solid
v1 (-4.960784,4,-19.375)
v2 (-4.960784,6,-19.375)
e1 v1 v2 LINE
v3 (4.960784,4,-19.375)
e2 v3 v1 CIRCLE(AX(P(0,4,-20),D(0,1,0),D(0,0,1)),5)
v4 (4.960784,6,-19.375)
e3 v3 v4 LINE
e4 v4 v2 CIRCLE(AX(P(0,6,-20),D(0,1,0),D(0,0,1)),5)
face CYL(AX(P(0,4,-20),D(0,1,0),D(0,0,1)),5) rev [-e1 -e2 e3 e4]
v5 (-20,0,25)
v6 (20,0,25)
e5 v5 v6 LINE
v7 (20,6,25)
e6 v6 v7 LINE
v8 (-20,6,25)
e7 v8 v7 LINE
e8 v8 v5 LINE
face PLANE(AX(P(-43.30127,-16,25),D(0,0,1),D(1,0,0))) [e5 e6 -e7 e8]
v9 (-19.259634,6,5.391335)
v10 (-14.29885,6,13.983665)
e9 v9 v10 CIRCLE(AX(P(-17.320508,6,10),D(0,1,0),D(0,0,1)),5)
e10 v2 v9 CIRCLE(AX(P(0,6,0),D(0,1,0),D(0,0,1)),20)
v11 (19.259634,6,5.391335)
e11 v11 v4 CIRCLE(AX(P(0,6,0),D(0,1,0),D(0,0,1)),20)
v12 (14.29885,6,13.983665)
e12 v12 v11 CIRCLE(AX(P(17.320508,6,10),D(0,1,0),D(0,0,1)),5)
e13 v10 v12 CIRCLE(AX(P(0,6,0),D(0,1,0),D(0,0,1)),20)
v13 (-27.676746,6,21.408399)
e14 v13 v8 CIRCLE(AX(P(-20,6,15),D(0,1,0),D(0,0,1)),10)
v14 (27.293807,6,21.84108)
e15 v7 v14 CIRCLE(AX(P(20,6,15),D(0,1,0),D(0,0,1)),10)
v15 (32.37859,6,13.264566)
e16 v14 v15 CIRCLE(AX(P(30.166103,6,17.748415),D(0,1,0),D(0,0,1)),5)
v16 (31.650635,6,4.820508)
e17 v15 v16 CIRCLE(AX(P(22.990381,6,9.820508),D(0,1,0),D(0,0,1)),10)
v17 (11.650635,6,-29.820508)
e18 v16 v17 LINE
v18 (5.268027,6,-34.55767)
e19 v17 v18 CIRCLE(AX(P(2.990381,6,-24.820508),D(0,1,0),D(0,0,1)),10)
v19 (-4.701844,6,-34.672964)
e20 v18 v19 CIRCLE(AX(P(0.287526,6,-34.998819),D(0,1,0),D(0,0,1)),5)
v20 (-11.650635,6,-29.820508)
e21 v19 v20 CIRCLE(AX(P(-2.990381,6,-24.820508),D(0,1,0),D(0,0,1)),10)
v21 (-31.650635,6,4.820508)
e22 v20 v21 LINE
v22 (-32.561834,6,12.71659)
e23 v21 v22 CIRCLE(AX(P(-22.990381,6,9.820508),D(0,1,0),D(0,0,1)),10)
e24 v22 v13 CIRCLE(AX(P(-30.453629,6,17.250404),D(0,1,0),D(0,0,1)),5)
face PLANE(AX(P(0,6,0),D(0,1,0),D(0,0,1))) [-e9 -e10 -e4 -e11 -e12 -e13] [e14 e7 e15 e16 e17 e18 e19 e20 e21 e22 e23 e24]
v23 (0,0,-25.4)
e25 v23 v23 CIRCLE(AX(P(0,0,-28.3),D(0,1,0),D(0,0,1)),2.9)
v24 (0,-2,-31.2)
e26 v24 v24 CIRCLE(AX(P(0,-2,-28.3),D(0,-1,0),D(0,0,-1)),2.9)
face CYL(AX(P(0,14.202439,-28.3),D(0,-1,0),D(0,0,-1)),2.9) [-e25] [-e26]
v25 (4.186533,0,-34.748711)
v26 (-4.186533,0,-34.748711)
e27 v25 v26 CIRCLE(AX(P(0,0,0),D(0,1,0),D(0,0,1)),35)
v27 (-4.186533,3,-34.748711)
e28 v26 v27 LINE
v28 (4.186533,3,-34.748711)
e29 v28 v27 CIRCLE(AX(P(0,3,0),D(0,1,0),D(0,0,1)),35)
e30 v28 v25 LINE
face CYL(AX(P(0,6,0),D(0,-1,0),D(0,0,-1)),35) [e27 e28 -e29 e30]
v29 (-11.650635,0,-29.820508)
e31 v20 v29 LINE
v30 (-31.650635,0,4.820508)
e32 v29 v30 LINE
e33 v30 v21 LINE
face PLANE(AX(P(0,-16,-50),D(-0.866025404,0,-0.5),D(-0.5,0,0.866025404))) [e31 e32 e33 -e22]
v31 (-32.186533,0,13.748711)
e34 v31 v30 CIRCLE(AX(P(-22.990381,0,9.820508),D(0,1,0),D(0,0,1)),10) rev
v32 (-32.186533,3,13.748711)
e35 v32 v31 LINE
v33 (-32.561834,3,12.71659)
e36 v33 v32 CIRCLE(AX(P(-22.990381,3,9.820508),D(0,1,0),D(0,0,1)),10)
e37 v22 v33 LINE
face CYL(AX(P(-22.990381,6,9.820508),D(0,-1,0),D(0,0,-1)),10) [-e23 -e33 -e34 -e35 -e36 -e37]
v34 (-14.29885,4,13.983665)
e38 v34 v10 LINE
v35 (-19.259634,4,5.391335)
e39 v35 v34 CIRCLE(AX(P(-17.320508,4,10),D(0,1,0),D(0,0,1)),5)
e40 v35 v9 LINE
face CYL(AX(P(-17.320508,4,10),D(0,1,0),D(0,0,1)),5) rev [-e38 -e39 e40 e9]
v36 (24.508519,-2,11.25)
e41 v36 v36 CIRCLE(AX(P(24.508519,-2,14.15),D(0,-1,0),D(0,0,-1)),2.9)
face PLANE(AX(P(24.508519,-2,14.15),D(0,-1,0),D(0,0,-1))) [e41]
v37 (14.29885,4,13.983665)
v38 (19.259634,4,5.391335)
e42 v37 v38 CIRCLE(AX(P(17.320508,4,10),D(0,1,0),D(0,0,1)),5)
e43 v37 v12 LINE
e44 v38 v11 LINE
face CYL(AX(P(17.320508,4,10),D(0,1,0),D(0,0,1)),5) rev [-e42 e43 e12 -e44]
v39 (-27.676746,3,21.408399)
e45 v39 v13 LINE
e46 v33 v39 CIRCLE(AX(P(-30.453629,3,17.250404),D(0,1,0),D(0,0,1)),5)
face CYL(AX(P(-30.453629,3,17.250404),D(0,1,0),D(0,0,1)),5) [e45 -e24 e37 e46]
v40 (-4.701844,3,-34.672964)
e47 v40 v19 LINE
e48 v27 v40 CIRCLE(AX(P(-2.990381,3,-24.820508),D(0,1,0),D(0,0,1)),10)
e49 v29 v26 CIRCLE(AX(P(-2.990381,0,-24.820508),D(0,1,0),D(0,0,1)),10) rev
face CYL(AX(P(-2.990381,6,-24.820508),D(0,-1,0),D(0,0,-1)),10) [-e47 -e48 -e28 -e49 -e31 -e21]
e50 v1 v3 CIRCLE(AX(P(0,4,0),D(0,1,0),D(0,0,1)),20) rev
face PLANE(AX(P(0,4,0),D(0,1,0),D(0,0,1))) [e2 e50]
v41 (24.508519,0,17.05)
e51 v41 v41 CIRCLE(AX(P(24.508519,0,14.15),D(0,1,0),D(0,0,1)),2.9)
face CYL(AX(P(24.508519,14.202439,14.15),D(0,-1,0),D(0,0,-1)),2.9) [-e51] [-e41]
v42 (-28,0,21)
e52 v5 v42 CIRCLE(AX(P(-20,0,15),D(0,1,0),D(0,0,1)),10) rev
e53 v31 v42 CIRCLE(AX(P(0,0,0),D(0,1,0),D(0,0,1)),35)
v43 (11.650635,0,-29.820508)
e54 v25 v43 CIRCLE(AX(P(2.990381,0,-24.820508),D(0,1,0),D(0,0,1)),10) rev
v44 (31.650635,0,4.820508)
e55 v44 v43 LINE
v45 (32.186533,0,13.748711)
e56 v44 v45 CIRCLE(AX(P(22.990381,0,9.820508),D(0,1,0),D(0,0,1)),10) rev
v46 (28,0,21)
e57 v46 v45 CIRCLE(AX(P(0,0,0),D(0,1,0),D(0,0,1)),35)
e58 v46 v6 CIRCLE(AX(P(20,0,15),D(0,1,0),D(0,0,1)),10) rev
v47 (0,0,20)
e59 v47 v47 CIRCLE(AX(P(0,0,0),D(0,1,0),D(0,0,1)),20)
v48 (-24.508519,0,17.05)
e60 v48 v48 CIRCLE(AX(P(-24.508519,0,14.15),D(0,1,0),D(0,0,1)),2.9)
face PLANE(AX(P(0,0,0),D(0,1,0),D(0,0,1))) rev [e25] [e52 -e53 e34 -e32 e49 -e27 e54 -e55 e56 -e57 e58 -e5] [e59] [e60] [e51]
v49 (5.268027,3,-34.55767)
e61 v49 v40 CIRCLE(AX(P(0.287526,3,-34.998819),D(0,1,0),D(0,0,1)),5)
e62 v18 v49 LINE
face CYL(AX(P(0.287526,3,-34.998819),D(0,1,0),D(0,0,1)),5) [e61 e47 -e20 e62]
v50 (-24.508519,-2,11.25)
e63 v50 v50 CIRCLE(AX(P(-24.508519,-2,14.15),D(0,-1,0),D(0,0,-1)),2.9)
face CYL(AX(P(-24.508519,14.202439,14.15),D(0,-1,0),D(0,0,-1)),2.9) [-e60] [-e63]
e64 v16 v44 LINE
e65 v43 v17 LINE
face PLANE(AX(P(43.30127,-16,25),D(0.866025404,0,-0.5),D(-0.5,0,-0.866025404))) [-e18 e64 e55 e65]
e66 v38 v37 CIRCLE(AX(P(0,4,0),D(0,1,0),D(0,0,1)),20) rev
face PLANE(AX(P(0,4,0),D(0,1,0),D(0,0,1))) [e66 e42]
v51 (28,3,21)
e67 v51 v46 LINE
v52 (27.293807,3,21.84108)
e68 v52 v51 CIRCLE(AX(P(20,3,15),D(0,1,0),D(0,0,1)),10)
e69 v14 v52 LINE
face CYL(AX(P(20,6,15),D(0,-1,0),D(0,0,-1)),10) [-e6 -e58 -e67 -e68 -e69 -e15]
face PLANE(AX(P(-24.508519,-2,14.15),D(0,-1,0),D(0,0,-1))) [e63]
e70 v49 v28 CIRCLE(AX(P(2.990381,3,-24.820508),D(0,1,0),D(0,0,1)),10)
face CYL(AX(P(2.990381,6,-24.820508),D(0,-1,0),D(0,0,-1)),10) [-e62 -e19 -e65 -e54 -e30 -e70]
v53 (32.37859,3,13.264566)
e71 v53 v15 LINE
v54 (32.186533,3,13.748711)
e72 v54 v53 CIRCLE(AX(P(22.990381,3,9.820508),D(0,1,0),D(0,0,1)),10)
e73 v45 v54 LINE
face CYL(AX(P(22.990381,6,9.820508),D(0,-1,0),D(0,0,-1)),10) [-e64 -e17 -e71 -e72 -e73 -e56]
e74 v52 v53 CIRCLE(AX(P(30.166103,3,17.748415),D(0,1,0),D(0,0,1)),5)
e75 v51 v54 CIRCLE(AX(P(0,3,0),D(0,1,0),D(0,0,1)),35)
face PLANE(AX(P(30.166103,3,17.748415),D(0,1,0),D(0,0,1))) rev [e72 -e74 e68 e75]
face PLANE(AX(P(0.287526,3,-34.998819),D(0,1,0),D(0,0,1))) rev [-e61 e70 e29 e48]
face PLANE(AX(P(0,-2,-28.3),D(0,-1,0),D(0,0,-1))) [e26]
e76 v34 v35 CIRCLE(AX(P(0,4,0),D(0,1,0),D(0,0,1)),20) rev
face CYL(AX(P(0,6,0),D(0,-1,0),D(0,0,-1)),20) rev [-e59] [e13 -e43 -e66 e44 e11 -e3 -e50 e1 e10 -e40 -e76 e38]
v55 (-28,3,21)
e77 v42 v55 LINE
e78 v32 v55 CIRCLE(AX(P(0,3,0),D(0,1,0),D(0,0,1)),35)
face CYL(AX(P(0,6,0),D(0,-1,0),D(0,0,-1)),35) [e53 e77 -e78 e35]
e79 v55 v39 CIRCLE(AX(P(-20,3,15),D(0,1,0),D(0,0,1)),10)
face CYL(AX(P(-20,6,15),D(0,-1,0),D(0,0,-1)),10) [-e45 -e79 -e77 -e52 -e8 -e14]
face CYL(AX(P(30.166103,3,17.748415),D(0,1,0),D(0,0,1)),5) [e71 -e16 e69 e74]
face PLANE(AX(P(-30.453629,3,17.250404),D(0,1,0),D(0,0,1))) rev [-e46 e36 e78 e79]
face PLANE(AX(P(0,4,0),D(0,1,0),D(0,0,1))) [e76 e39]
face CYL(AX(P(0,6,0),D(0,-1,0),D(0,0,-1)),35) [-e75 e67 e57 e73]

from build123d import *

# Parameters (mm, degrees)
SKETCH1_R                = 20
BOSS_EXTRUDE1_DEPTH      = 3.5
SKETCH2_R                = 35
SKETCH2_R_2              = 20
SKETCH2_R_3              = 2.8
BOSS_EXTRUDE2_DEPTH      = 6
BOSS_EXTRUDE3_DEPTH      = 2
BOSS_EXTRUDE3_DEPTH_BACK = 6
SKETCH4_R                = 2.9
SKETCH5_R                = 5
BOSS_EXTRUDE4_DEPTH      = 3
CUT_EXTRUDE1_START       = -10
SKETCH3_R                = 20
CUT_EXTRUDE1_DEPTH       = 10
SKETCH12_R               = 72.135852014
CUT_EXTRUDE2_DEPTH       = 22
FILLET1_R                = 10
CUT_EXTRUDE4_START       = -2
SKETCH15_R               = 5
SKETCH15_R_2             = 20
CUT_EXTRUDE4_DEPTH       = 2


with BuildPart() as part:
    # Sketch1 → Boss-Extrude1 (new body)
    with BuildSketch(Plane(origin=(0, 0, 0), x_dir=(1, 0, 0), z_dir=(0, 1, 0))):
        with Locations(Location((0, 0, 0), (0, 0, 270))):
            Circle(SKETCH1_R)
    extrude(amount=BOSS_EXTRUDE1_DEPTH)

    # Sketch2 → Boss-Extrude2 (add)
    with BuildSketch(Plane(origin=(0, 0, 0), x_dir=(1, 0, 0), z_dir=(0, 1, 0))):
        with Locations(Location((0, 0, 0), (0, 0, 270))):
            Circle(SKETCH2_R)
        with Locations(Location((0, 0, 0), (0, 0, 270))):
            Circle(SKETCH2_R_2, mode=Mode.SUBTRACT)
        with Locations(Location((0, 28.3, 0), (0, 0, 270))):
            Circle(SKETCH2_R_3, mode=Mode.SUBTRACT)
        with Locations(Location((24.508518927, -14.15, 0), (0, 0, 270))):
            Circle(SKETCH2_R_3, mode=Mode.SUBTRACT)
        with Locations(Location((-24.508518927, -14.15, 0), (0, 0, 270))):
            Circle(SKETCH2_R_3, mode=Mode.SUBTRACT)
    extrude(amount=BOSS_EXTRUDE2_DEPTH)

    # Sketch4 → Boss-Extrude3 (add, two sides: drawn at the far end of the back side and taken through both)
    with BuildSketch(Plane.XZ.offset(-BOSS_EXTRUDE3_DEPTH_BACK)):
        with Locations(Location((-24.508518927, 14.15, 0), (0, 0, 270))):
            Circle(SKETCH4_R)
        with Locations(Location((24.508518927, 14.15, 0), (0, 0, 270))):
            Circle(SKETCH4_R)
        with Locations(Location((0, -28.3, 0), (0, 0, 270))):
            Circle(SKETCH4_R)
    extrude(amount=BOSS_EXTRUDE3_DEPTH + BOSS_EXTRUDE3_DEPTH_BACK)

    # Sketch5 → Boss-Extrude4 (add)
    with BuildSketch(Plane(origin=(0, 6, 0), x_dir=(1, 0, 0), z_dir=(0, 1, 0))):
        with Locations((-30.453629482, -17.250404383)):
            Circle(SKETCH5_R)
        with Locations((0.28752632, 34.99881896)):
            Circle(SKETCH5_R)
        with Locations((30.166103162, -17.748414577)):
            Circle(SKETCH5_R)
    extrude(amount=-BOSS_EXTRUDE4_DEPTH)

    # Sketch3 → Cut-Extrude1 (cut)
    with BuildSketch(Plane(origin=(0, 3.5, 0), x_dir=(1, 0, 0), z_dir=(0, 1, 0)).offset(CUT_EXTRUDE1_START)):
        with Locations(Location((0, 0, 0), (0, 0, 270))):
            Circle(SKETCH3_R)
    extrude(amount=CUT_EXTRUDE1_DEPTH, mode=Mode.SUBTRACT)

    # Sketch12 → Cut-Extrude2 (cut)
    with BuildSketch(Plane(origin=(0, 6, 0), x_dir=(1, 0, 0), z_dir=(0, 1, 0))):
        Circle(SKETCH12_R)
        Polygon((0, 50), (-43.301270189, -25), (43.301270189, -25), align=None, mode=Mode.SUBTRACT)
    extrude(amount=-CUT_EXTRUDE2_DEPTH, mode=Mode.SUBTRACT)

    # Fillet1
    # the kernel refuses this fillet: 10 mm, written as the material it takes off along each edge
    with BuildSketch(Plane(origin=(-24.494897428, 19.2960859, 25), x_dir=(1, 0, 0), z_dir=(0, -1, 0))) as fillet1_piece_1_section:
        with BuildLine():
            CenterArc((4.494897428, -10), FILLET1_R, 90, 53.130102354)
            ThreePointArc((-3.505102572, -4), (-1.828638885, -1.933326291), (0, 0))
            Line((0, 0), (4.494897428, 0))
        make_face()
    fillet1_piece_1 = extrude(amount=32.5921718, mode=Mode.PRIVATE)
    fillet1_piece_1 = fillet1_piece_1 - Plane(origin=(-30.453629482, 4.5, 17.250404383), x_dir=(1, 0, 0), z_dir=(0, 1, 0)) * Cylinder(5, 84, mode=Mode.PRIVATE)
    add(fillet1_piece_1, mode=Mode.SUBTRACT)
    with BuildSketch(Plane(origin=(-24.494897428, 19.2960859, 25), x_dir=(1, 0, 0), z_dir=(0, -1, 0))) as fillet1_piece_2_section:
        with BuildLine():
            CenterArc((4.494897428, -10), FILLET1_R, 90, 53.130102354)
            ThreePointArc((-3.505102572, -4), (-1.828638885, -1.933326291), (0, 0))
            Line((0, 0), (4.494897428, 0))
        make_face()
    fillet1_piece_2 = extrude(amount=32.5921718, mode=Mode.PRIVATE)
    fillet1_piece_2 = split(fillet1_piece_2, bisect_by=Plane(origin=(-27.761621835, 3, 21.309124186), z_dir=(0, -1, 0)), keep=Keep.TOP, mode=Mode.PRIVATE)
    add(fillet1_piece_2, mode=Mode.SUBTRACT)
    with BuildSketch(Plane(origin=(24.494897428, 19.2960859, 25), x_dir=(-1, 0, 0), z_dir=(0, -1, 0))) as fillet1_piece_3_section:
        with BuildLine():
            CenterArc((4.494897428, 10), FILLET1_R, 216.869897646, 53.130102354)
            ThreePointArc((-3.505102572, 4), (-1.828638885, 1.933326291), (0, 0))
            Line((0, 0), (4.494897428, 0))
        make_face()
    fillet1_piece_3 = extrude(amount=32.5921718, mode=Mode.PRIVATE)
    fillet1_piece_3 = fillet1_piece_3 - Plane(origin=(30.166103162, 4.5, 17.748414577), x_dir=(1, 0, 0), z_dir=(0, 1, 0)) * Cylinder(5, 84, mode=Mode.PRIVATE)
    add(fillet1_piece_3, mode=Mode.SUBTRACT)
    with BuildSketch(Plane(origin=(24.494897428, 19.2960859, 25), x_dir=(-1, 0, 0), z_dir=(0, -1, 0))) as fillet1_piece_4_section:
        with BuildLine():
            CenterArc((4.494897428, 10), FILLET1_R, 216.869897646, 53.130102354)
            ThreePointArc((-3.505102572, 4), (-1.828638885, 1.933326291), (0, 0))
            Line((0, 0), (4.494897428, 0))
        make_face()
    fillet1_piece_4 = extrude(amount=32.5921718, mode=Mode.PRIVATE)
    fillet1_piece_4 = split(fillet1_piece_4, bisect_by=Plane(origin=(27.488157838, 3, 21.643747381), z_dir=(0, -1, 0)), keep=Keep.TOP, mode=Mode.PRIVATE)
    add(fillet1_piece_4, mode=Mode.SUBTRACT)
    with BuildSketch(Plane(origin=(-9.403186381, 19.2960859, -33.713203436), x_dir=(-0.5000000000000003, 0, 0.8660254037844386), z_dir=(0, -1, 0))) as fillet1_piece_5_section:
        with BuildLine():
            CenterArc((4.494897428, -10), FILLET1_R, 90, 53.130102354)
            ThreePointArc((-3.505102572, -4), (-1.828638885, -1.933326291), (0, 0))
            Line((0, 0), (4.494897428, 0))
        make_face()
    fillet1_piece_5 = extrude(amount=32.5921718, mode=Mode.PRIVATE)
    fillet1_piece_5 = fillet1_piece_5 - Plane(origin=(0.28752632, 4.5, -34.99881896), x_dir=(1, 0, 0), z_dir=(0, 1, 0)) * Cylinder(5, 84, mode=Mode.PRIVATE)
    add(fillet1_piece_5, mode=Mode.SUBTRACT)
    with BuildSketch(Plane(origin=(-9.403186381, 19.2960859, -33.713203436), x_dir=(-0.5000000000000003, 0, 0.8660254037844386), z_dir=(0, -1, 0))) as fillet1_piece_6_section:
        with BuildLine():
            CenterArc((4.494897428, -10), FILLET1_R, 90, 53.130102354)
            ThreePointArc((-3.505102572, -4), (-1.828638885, -1.933326291), (0, 0))
            Line((0, 0), (4.494897428, 0))
        make_face()
    fillet1_piece_6 = extrude(amount=32.5921718, mode=Mode.PRIVATE)
    fillet1_piece_6 = split(fillet1_piece_6, bisect_by=Plane(origin=(-4.57343196, 3, -34.696831852), z_dir=(0, -1, 0)), keep=Keep.TOP, mode=Mode.PRIVATE)
    add(fillet1_piece_6, mode=Mode.SUBTRACT)
    with BuildSketch(Plane(origin=(-33.898083809, 19.2960859, 8.713203436), x_dir=(0.32181469455231854, 0, 0.9468026734067654), z_dir=(0, -1, 0))) as fillet1_piece_7_section:
        with BuildLine():
            CenterArc((4.558658023, -9.971095222), FILLET1_R, 85.642603122, 53.130102354)
            Line((-2.962352352, -3.380617019), (0, 0))
            ThreePointArc((0, 0), (2.65921718, 0.101166725), (5.31843436, 0))
        make_face()
    fillet1_piece_7 = extrude(amount=32.5921718, mode=Mode.PRIVATE)
    fillet1_piece_7 = fillet1_piece_7 - Plane(origin=(-30.453629482, 4.5, 17.250404383), x_dir=(1, 0, 0), z_dir=(0, 1, 0)) * Cylinder(5, 87, mode=Mode.PRIVATE)
    add(fillet1_piece_7, mode=Mode.SUBTRACT)
    with BuildSketch(Plane(origin=(-33.898083809, 19.2960859, 8.713203436), x_dir=(0.32181469455231854, 0, 0.9468026734067654), z_dir=(0, -1, 0))) as fillet1_piece_8_section:
        with BuildLine():
            CenterArc((4.558658023, -9.971095222), FILLET1_R, 85.642603122, 53.130102354)
            Line((-2.962352352, -3.380617019), (0, 0))
            ThreePointArc((0, 0), (2.65921718, 0.101166725), (5.31843436, 0))
        make_face()
    fillet1_piece_8 = extrude(amount=32.5921718, mode=Mode.PRIVATE)
    fillet1_piece_8 = split(fillet1_piece_8, bisect_by=Plane(origin=(-32.488113984, 3, 12.9835693), z_dir=(0, -1, 0)), keep=Keep.TOP, mode=Mode.PRIVATE)
    add(fillet1_piece_8, mode=Mode.SUBTRACT)
    with BuildSketch(Plane(origin=(33.898083809, 19.2960859, 8.713203436), x_dir=(-0.5000000000000012, 0, -0.8660254037844382), z_dir=(0, -1, 0))) as fillet1_piece_9_section:
        with BuildLine():
            CenterArc((4.494897428, -10), FILLET1_R, 90, 53.130102354)
            ThreePointArc((-3.505102572, -4), (-1.828638885, -1.933326291), (0, 0))
            Line((0, 0), (4.494897428, 0))
        make_face()
    fillet1_piece_9 = extrude(amount=32.5921718, mode=Mode.PRIVATE)
    fillet1_piece_9 = fillet1_piece_9 - Plane(origin=(30.166103162, 4.5, 17.748414577), x_dir=(1, 0, 0), z_dir=(0, 1, 0)) * Cylinder(5, 84, mode=Mode.PRIVATE)
    add(fillet1_piece_9, mode=Mode.SUBTRACT)
    with BuildSketch(Plane(origin=(33.898083809, 19.2960859, 8.713203436), x_dir=(-0.5000000000000012, 0, -0.8660254037844382), z_dir=(0, -1, 0))) as fillet1_piece_10_section:
        with BuildLine():
            CenterArc((4.494897428, -10), FILLET1_R, 90, 53.130102354)
            ThreePointArc((-3.505102572, -4), (-1.828638885, -1.933326291), (0, 0))
            Line((0, 0), (4.494897428, 0))
        make_face()
    fillet1_piece_10 = extrude(amount=32.5921718, mode=Mode.PRIVATE)
    fillet1_piece_10 = split(fillet1_piece_10, bisect_by=Plane(origin=(32.335053795, 3, 13.387707666), z_dir=(0, -1, 0)), keep=Keep.TOP, mode=Mode.PRIVATE)
    add(fillet1_piece_10, mode=Mode.SUBTRACT)
    with BuildSketch(Plane(origin=(9.403186381, 19.2960859, -33.713203436), x_dir=(-0.9808625148174394, 0, -0.19470163590994477), z_dir=(0, -1, 0))) as fillet1_piece_11_section:
        with BuildLine():
            CenterArc((4.558658023, -9.971095222), FILLET1_R, 85.642603122, 53.130102354)
            Line((-2.962352352, -3.380617019), (0, 0))
            ThreePointArc((0, 0), (2.65921718, 0.101166725), (5.31843436, 0))
        make_face()
    fillet1_piece_11 = extrude(amount=32.5921718, mode=Mode.PRIVATE)
    fillet1_piece_11 = fillet1_piece_11 - Plane(origin=(0.28752632, 4.5, -34.99881896), x_dir=(1, 0, 0), z_dir=(0, 1, 0)) * Cylinder(5, 87, mode=Mode.PRIVATE)
    add(fillet1_piece_11, mode=Mode.SUBTRACT)
    with BuildSketch(Plane(origin=(9.403186381, 19.2960859, -33.713203436), x_dir=(-0.9808625148174394, 0, -0.19470163590994477), z_dir=(0, -1, 0))) as fillet1_piece_12_section:
        with BuildLine():
            CenterArc((4.558658023, -9.971095222), FILLET1_R, 85.642603122, 53.130102354)
            Line((-2.962352352, -3.380617019), (0, 0))
            ThreePointArc((0, 0), (2.65921718, 0.101166725), (5.31843436, 0))
        make_face()
    fillet1_piece_12 = extrude(amount=32.5921718, mode=Mode.PRIVATE)
    fillet1_piece_12 = split(fillet1_piece_12, bisect_by=Plane(origin=(4.999956146, 3, -34.627316681), z_dir=(0, -1, 0)), keep=Keep.TOP, mode=Mode.PRIVATE)
    add(fillet1_piece_12, mode=Mode.SUBTRACT)

    # Sketch15 → Cut-Extrude4 (cut)
    with BuildSketch(Plane(origin=(0, 6, 0), x_dir=(1, 0, 0), z_dir=(0, 1, 0)).offset(CUT_EXTRUDE4_START)):
        with Locations((0, 20)):
            Circle(SKETCH15_R)
        with Locations(Location((0, 0, 0), (0, 0, 104.361511563))):
            Circle(SKETCH15_R_2)
        with Locations((-17.320508076, -10)):
            Circle(SKETCH15_R)
        with Locations((17.320508076, -10)):
            Circle(SKETCH15_R)
    extrude(amount=CUT_EXTRUDE4_DEPTH, mode=Mode.SUBTRACT)


solid = part.part
